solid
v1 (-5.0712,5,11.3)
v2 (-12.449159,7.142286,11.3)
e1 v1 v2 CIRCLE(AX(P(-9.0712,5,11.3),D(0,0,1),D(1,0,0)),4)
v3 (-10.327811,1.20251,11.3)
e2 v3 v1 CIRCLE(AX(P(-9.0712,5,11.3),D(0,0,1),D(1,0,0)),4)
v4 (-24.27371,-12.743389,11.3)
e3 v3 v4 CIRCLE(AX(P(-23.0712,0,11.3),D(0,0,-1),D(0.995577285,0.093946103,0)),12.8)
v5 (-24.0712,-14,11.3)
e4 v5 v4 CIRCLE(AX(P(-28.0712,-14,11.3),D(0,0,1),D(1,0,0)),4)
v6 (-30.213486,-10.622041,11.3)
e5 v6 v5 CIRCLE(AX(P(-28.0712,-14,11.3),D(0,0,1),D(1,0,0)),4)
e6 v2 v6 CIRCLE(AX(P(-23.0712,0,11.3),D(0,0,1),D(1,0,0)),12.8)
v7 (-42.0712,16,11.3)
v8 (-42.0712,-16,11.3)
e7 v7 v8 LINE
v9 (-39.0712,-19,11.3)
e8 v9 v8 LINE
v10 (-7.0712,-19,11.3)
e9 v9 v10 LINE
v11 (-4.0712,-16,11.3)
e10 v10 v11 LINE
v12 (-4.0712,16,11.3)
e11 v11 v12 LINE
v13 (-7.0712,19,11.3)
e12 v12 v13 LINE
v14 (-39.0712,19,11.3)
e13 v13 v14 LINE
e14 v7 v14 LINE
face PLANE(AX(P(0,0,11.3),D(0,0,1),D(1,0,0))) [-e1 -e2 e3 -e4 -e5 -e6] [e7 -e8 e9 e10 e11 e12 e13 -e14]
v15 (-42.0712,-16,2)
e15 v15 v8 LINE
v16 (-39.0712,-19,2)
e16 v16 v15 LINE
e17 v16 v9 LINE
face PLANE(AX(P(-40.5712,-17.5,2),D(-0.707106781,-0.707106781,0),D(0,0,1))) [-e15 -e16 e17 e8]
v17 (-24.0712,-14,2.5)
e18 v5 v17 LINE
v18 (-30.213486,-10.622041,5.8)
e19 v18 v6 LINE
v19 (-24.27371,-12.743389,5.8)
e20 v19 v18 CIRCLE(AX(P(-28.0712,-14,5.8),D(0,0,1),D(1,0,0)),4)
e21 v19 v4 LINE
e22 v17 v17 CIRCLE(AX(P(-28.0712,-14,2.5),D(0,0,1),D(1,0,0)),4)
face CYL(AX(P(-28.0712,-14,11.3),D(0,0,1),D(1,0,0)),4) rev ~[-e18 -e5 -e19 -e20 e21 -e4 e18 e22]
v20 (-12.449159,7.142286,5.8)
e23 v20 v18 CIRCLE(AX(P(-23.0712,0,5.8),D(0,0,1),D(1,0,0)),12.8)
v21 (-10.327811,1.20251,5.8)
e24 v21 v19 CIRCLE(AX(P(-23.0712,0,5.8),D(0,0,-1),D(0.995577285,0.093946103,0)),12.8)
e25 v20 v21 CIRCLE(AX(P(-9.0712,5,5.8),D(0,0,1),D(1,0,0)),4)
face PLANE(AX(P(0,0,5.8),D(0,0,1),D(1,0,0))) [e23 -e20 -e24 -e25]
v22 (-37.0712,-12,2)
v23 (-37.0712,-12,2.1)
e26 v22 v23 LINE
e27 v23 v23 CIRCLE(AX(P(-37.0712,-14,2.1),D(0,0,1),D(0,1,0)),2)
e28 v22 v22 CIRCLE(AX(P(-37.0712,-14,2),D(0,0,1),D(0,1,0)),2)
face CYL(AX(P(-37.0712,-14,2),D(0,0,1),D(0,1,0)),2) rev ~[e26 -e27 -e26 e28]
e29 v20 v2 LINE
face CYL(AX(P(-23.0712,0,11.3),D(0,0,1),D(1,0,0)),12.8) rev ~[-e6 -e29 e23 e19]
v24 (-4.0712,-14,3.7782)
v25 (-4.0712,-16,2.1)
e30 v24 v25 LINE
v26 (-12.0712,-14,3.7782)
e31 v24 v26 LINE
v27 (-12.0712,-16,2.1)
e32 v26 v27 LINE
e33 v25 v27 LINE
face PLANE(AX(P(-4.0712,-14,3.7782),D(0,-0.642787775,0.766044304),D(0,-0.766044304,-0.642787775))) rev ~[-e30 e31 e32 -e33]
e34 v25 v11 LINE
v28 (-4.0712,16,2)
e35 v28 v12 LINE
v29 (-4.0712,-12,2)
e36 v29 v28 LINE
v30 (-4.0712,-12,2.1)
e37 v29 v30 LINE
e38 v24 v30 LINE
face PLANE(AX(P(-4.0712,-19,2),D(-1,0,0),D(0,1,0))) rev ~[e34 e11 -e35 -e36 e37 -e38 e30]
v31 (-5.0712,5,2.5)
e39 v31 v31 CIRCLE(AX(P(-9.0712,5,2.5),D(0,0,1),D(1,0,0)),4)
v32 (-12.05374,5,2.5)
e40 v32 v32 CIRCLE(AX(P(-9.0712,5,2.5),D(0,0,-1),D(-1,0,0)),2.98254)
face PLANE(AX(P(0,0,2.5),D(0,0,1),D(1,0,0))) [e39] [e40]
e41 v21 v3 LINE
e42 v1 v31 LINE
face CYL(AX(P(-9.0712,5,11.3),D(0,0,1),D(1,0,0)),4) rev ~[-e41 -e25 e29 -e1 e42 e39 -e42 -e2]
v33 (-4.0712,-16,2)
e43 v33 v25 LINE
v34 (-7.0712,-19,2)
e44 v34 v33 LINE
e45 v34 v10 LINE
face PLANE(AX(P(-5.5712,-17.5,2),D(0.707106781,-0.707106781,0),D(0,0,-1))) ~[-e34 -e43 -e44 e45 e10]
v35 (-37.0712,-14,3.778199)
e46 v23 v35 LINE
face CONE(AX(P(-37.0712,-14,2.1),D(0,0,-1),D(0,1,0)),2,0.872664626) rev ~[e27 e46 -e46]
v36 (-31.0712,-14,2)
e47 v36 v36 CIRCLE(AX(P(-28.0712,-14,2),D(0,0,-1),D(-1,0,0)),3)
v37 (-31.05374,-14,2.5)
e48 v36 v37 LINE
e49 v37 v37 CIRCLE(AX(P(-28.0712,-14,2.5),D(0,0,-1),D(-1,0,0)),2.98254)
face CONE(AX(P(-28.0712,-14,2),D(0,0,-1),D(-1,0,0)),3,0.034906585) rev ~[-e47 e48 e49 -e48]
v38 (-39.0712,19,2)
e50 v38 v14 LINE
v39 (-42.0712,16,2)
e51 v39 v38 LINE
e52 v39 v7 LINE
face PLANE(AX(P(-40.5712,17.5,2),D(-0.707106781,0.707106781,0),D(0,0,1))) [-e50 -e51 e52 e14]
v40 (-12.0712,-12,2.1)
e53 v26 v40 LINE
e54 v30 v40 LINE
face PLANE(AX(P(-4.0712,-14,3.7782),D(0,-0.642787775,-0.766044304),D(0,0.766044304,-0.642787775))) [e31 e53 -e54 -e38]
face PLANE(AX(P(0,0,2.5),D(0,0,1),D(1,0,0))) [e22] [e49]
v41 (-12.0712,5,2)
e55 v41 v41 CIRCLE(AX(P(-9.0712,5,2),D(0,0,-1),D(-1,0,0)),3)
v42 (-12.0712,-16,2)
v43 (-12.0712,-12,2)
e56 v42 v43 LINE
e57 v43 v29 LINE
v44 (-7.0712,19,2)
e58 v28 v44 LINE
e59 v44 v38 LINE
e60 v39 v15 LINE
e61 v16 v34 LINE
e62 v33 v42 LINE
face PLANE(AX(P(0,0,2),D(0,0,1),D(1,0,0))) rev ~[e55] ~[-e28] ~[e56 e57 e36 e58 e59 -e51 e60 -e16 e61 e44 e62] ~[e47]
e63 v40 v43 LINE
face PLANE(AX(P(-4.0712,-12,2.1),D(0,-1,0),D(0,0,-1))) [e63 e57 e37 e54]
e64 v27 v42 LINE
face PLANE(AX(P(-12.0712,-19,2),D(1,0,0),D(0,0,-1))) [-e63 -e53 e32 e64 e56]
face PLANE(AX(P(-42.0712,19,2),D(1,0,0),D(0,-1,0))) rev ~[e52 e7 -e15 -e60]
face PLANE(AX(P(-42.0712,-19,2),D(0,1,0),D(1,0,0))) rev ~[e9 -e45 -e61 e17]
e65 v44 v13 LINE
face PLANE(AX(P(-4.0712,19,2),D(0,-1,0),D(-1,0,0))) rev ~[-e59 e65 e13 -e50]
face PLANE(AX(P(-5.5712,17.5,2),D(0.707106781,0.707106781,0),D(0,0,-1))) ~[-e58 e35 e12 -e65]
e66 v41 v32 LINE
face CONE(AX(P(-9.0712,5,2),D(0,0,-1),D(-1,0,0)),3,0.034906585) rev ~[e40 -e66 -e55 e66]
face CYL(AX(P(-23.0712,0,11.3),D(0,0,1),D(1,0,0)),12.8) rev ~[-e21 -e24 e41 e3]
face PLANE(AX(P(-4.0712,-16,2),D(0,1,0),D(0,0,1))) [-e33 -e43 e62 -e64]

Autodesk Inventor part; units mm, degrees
ref_plane "YZ Plane" through (0, 0, 0) normal (1, 0, 0) x (0, 1, 0)
ref_plane "XZ Plane" through (0, 0, 0) normal (0, 1, 0) x (-1, 0, 0)
ref_plane "XY Plane" through (0, 0, 0) normal (0, 0, 1) x (1, 0, 0)
ref_plane "Work Plane1" through (0, 0, 2) normal (0, 0, 1) x (1, 0, 0)
sketch "Sketch1" plane through (0, 0, 2) normal (0, 0, 1) x (1, 0, 0)
  line L0 (-37.0712, 14) -> (-9.0712, 14) construction
  line L1 (-9.0712, 14) -> (-9.0712, -14) construction
  line L2 (-9.0712, -14) -> (-37.0712, -14) construction
  line L3 (-37.0712, -14) -> (-37.0712, 14) construction
  line L4 (-4.0712, -19) -> (-4.0712, 19)
  line L5 (-4.0712, 19) -> (-42.0712, 19)
  line L6 (-42.0712, 19) -> (-42.0712, -19)
  line L7 (-42.0712, -19) -> (-4.0712, -19)
  circle A0 centre (-23.0712, 0) radius 12.8
  point P0 (0, 0)
  dimension "d0" = 5
extrude "Extrusion1" add sketch "Sketch1" along normal blind 9.3 contours L7 L6 L5 L4 | A0
sketch "Sketch3" plane through (0, 0, 2) normal (0, 0, -1) x (-1, 0, 0)
  circle A0 centre (9.0712, -14) radius 1.45 construction
  circle A1 centre (9.0712, -14) radius 2.45
  circle A2 centre (37.0712, -14) radius 1.45 projected
  circle A3 centre (37.0712, -14) radius 1.95
  point P0 (0, 0)
  dimension "d8" = 1
  dimension "d10" = 0.5
chamfer "Chamfer1" distance 3 angle 45 4 edges at (-42.0712, 19, 6.65) (-4.0712, 19, 6.65) (-4.0712, -19, 6.65) (-42.0712, -19, 6.65)
hole "Hole1" at (-37.0712, -14, 2) direction (0, 0, 1) diameter 4 depth 0.1 tip angle 100
sketch "Sketch4" plane through (-4.0712, -19, 2) normal (1, 0, 0) x (0, 0, -1)
  line L0 (2, 4.45) -> (6, 4.45)
  line L1 (2, 1.55) -> (6, 1.55)
  line L2 (0, 0) -> (0, 38) projected
  arc A0 (2, 19) -> (2, 19) centre (1.5, 4.4206) ccw projected
  line L3 (-1.7782, 5) -> (-0.1, 7) projected
  line L4 (-1.7782, 5) -> (-0.1, 3) projected
  line L5 (-0.1, 7) -> (0.6045, 7)
  line L6 (0.6045, 7) -> (0.6045, 3)
  line L7 (0.6045, 3) -> (-0.1, 3)
  line L8 (-0.1, 3) -> (-0.1, 7)
extrude "Extrusion4" cut sketch "Sketch4" against normal blind 8 contours L7 L8 L5 L2 | L2 L5 L6 L7 | L4 L3 L8
ref_plane "Arbeitsebene2" through (-23.0712, -12, 2) normal (1, 0, 0) x (0, 0, -1)
ref_plane "Arbeitsebene3" through (-39.0712, 0, 2) normal (0, -1, 0) x (1, 0, 0)
sketch "Skizze9" plane through (0, 0, 2) normal (0, 0, -1) x (-1, 0, 0)
  line L0 (12.0712, -16) -> (4.0712, -16) projected
  line L1 (7.0712, -19) -> (4.0712, -16) projected
  line L2 (39.0712, -19) -> (7.0712, -19) projected
  line L3 (42.0712, -16) -> (39.0712, -19) projected
  line L4 (42.0712, 16) -> (42.0712, -16) projected
  line L5 (39.0712, 19) -> (42.0712, 16) projected
  line L6 (7.0712, 19) -> (39.0712, 19) projected
  line L7 (4.0712, 16) -> (7.0712, 19) projected
  line L8 (4.0712, -12) -> (4.0712, 16) projected
  line L9 (4.0712, -12) -> (12.0712, -12) projected
  line L10 (12.0712, -12) -> (12.0712, -16) projected
  circle A0 centre (37.0712, -14) radius 2 projected
  circle A1 centre (28.0712, -14) radius 3
  circle A2 centre (9.0712, 5) radius 3
  point P0 (0, 0)
  dimension "d54" = 6
  dimension "d55" = 6
  dimension "d56" = 14
  dimension "d57" = 5
  dimension "d58" = 5
  dimension "d59" = 14
extrude "Extrusion9" cut sketch "Skizze9" against normal blind 3 draft -2 contours A1 | A2
sketch "Skizze10" plane through (0, 0, 11.3) normal (0, 0, 1) x (1, 0, 0)
  circle A0 centre (-9.0712, 5) radius 4.05 projected
  circle A1 centre (-28.0712, -14) radius 4.55 projected
  circle A2 centre (-9.0712, 5) radius 4
  circle A3 centre (-28.0712, -14) radius 2.8952 projected
  circle A4 centre (-28.0712, -14) radius 4
  point P0 (0, 0)
  dimension "d62" = 8
  dimension "d63" = 8
extrude "Extrusion10" cut sketch "Skizze10" against normal blind 8.8 contours A2 | A3 | A4
sketch "Sketch11" plane through (0, 0, 11.3) normal (0, 0, 1) x (1, 0, 0)
  circle A0 centre (-23.0712, 0) radius 12.8
  line L0 (-39.0712, -19) -> (-7.0712, -19) projected
  line L1 (-42.0712, 16) -> (-42.0712, -16) projected
  point P0 (0, 0)
  point P1 (-23.0712, -19)
  point P2 (-42.0712, 0)
  dimension "d66" = 25.6
extrude "Extrusion11" cut sketch "Sketch11" against normal blind 5.5
equation "\"d54\" = d55"
equation "\"d59\" = d56"
properties part number "20_Cube_Insert_Kinematic_Astromedia_30x40x1_45_pro_magnetic"
